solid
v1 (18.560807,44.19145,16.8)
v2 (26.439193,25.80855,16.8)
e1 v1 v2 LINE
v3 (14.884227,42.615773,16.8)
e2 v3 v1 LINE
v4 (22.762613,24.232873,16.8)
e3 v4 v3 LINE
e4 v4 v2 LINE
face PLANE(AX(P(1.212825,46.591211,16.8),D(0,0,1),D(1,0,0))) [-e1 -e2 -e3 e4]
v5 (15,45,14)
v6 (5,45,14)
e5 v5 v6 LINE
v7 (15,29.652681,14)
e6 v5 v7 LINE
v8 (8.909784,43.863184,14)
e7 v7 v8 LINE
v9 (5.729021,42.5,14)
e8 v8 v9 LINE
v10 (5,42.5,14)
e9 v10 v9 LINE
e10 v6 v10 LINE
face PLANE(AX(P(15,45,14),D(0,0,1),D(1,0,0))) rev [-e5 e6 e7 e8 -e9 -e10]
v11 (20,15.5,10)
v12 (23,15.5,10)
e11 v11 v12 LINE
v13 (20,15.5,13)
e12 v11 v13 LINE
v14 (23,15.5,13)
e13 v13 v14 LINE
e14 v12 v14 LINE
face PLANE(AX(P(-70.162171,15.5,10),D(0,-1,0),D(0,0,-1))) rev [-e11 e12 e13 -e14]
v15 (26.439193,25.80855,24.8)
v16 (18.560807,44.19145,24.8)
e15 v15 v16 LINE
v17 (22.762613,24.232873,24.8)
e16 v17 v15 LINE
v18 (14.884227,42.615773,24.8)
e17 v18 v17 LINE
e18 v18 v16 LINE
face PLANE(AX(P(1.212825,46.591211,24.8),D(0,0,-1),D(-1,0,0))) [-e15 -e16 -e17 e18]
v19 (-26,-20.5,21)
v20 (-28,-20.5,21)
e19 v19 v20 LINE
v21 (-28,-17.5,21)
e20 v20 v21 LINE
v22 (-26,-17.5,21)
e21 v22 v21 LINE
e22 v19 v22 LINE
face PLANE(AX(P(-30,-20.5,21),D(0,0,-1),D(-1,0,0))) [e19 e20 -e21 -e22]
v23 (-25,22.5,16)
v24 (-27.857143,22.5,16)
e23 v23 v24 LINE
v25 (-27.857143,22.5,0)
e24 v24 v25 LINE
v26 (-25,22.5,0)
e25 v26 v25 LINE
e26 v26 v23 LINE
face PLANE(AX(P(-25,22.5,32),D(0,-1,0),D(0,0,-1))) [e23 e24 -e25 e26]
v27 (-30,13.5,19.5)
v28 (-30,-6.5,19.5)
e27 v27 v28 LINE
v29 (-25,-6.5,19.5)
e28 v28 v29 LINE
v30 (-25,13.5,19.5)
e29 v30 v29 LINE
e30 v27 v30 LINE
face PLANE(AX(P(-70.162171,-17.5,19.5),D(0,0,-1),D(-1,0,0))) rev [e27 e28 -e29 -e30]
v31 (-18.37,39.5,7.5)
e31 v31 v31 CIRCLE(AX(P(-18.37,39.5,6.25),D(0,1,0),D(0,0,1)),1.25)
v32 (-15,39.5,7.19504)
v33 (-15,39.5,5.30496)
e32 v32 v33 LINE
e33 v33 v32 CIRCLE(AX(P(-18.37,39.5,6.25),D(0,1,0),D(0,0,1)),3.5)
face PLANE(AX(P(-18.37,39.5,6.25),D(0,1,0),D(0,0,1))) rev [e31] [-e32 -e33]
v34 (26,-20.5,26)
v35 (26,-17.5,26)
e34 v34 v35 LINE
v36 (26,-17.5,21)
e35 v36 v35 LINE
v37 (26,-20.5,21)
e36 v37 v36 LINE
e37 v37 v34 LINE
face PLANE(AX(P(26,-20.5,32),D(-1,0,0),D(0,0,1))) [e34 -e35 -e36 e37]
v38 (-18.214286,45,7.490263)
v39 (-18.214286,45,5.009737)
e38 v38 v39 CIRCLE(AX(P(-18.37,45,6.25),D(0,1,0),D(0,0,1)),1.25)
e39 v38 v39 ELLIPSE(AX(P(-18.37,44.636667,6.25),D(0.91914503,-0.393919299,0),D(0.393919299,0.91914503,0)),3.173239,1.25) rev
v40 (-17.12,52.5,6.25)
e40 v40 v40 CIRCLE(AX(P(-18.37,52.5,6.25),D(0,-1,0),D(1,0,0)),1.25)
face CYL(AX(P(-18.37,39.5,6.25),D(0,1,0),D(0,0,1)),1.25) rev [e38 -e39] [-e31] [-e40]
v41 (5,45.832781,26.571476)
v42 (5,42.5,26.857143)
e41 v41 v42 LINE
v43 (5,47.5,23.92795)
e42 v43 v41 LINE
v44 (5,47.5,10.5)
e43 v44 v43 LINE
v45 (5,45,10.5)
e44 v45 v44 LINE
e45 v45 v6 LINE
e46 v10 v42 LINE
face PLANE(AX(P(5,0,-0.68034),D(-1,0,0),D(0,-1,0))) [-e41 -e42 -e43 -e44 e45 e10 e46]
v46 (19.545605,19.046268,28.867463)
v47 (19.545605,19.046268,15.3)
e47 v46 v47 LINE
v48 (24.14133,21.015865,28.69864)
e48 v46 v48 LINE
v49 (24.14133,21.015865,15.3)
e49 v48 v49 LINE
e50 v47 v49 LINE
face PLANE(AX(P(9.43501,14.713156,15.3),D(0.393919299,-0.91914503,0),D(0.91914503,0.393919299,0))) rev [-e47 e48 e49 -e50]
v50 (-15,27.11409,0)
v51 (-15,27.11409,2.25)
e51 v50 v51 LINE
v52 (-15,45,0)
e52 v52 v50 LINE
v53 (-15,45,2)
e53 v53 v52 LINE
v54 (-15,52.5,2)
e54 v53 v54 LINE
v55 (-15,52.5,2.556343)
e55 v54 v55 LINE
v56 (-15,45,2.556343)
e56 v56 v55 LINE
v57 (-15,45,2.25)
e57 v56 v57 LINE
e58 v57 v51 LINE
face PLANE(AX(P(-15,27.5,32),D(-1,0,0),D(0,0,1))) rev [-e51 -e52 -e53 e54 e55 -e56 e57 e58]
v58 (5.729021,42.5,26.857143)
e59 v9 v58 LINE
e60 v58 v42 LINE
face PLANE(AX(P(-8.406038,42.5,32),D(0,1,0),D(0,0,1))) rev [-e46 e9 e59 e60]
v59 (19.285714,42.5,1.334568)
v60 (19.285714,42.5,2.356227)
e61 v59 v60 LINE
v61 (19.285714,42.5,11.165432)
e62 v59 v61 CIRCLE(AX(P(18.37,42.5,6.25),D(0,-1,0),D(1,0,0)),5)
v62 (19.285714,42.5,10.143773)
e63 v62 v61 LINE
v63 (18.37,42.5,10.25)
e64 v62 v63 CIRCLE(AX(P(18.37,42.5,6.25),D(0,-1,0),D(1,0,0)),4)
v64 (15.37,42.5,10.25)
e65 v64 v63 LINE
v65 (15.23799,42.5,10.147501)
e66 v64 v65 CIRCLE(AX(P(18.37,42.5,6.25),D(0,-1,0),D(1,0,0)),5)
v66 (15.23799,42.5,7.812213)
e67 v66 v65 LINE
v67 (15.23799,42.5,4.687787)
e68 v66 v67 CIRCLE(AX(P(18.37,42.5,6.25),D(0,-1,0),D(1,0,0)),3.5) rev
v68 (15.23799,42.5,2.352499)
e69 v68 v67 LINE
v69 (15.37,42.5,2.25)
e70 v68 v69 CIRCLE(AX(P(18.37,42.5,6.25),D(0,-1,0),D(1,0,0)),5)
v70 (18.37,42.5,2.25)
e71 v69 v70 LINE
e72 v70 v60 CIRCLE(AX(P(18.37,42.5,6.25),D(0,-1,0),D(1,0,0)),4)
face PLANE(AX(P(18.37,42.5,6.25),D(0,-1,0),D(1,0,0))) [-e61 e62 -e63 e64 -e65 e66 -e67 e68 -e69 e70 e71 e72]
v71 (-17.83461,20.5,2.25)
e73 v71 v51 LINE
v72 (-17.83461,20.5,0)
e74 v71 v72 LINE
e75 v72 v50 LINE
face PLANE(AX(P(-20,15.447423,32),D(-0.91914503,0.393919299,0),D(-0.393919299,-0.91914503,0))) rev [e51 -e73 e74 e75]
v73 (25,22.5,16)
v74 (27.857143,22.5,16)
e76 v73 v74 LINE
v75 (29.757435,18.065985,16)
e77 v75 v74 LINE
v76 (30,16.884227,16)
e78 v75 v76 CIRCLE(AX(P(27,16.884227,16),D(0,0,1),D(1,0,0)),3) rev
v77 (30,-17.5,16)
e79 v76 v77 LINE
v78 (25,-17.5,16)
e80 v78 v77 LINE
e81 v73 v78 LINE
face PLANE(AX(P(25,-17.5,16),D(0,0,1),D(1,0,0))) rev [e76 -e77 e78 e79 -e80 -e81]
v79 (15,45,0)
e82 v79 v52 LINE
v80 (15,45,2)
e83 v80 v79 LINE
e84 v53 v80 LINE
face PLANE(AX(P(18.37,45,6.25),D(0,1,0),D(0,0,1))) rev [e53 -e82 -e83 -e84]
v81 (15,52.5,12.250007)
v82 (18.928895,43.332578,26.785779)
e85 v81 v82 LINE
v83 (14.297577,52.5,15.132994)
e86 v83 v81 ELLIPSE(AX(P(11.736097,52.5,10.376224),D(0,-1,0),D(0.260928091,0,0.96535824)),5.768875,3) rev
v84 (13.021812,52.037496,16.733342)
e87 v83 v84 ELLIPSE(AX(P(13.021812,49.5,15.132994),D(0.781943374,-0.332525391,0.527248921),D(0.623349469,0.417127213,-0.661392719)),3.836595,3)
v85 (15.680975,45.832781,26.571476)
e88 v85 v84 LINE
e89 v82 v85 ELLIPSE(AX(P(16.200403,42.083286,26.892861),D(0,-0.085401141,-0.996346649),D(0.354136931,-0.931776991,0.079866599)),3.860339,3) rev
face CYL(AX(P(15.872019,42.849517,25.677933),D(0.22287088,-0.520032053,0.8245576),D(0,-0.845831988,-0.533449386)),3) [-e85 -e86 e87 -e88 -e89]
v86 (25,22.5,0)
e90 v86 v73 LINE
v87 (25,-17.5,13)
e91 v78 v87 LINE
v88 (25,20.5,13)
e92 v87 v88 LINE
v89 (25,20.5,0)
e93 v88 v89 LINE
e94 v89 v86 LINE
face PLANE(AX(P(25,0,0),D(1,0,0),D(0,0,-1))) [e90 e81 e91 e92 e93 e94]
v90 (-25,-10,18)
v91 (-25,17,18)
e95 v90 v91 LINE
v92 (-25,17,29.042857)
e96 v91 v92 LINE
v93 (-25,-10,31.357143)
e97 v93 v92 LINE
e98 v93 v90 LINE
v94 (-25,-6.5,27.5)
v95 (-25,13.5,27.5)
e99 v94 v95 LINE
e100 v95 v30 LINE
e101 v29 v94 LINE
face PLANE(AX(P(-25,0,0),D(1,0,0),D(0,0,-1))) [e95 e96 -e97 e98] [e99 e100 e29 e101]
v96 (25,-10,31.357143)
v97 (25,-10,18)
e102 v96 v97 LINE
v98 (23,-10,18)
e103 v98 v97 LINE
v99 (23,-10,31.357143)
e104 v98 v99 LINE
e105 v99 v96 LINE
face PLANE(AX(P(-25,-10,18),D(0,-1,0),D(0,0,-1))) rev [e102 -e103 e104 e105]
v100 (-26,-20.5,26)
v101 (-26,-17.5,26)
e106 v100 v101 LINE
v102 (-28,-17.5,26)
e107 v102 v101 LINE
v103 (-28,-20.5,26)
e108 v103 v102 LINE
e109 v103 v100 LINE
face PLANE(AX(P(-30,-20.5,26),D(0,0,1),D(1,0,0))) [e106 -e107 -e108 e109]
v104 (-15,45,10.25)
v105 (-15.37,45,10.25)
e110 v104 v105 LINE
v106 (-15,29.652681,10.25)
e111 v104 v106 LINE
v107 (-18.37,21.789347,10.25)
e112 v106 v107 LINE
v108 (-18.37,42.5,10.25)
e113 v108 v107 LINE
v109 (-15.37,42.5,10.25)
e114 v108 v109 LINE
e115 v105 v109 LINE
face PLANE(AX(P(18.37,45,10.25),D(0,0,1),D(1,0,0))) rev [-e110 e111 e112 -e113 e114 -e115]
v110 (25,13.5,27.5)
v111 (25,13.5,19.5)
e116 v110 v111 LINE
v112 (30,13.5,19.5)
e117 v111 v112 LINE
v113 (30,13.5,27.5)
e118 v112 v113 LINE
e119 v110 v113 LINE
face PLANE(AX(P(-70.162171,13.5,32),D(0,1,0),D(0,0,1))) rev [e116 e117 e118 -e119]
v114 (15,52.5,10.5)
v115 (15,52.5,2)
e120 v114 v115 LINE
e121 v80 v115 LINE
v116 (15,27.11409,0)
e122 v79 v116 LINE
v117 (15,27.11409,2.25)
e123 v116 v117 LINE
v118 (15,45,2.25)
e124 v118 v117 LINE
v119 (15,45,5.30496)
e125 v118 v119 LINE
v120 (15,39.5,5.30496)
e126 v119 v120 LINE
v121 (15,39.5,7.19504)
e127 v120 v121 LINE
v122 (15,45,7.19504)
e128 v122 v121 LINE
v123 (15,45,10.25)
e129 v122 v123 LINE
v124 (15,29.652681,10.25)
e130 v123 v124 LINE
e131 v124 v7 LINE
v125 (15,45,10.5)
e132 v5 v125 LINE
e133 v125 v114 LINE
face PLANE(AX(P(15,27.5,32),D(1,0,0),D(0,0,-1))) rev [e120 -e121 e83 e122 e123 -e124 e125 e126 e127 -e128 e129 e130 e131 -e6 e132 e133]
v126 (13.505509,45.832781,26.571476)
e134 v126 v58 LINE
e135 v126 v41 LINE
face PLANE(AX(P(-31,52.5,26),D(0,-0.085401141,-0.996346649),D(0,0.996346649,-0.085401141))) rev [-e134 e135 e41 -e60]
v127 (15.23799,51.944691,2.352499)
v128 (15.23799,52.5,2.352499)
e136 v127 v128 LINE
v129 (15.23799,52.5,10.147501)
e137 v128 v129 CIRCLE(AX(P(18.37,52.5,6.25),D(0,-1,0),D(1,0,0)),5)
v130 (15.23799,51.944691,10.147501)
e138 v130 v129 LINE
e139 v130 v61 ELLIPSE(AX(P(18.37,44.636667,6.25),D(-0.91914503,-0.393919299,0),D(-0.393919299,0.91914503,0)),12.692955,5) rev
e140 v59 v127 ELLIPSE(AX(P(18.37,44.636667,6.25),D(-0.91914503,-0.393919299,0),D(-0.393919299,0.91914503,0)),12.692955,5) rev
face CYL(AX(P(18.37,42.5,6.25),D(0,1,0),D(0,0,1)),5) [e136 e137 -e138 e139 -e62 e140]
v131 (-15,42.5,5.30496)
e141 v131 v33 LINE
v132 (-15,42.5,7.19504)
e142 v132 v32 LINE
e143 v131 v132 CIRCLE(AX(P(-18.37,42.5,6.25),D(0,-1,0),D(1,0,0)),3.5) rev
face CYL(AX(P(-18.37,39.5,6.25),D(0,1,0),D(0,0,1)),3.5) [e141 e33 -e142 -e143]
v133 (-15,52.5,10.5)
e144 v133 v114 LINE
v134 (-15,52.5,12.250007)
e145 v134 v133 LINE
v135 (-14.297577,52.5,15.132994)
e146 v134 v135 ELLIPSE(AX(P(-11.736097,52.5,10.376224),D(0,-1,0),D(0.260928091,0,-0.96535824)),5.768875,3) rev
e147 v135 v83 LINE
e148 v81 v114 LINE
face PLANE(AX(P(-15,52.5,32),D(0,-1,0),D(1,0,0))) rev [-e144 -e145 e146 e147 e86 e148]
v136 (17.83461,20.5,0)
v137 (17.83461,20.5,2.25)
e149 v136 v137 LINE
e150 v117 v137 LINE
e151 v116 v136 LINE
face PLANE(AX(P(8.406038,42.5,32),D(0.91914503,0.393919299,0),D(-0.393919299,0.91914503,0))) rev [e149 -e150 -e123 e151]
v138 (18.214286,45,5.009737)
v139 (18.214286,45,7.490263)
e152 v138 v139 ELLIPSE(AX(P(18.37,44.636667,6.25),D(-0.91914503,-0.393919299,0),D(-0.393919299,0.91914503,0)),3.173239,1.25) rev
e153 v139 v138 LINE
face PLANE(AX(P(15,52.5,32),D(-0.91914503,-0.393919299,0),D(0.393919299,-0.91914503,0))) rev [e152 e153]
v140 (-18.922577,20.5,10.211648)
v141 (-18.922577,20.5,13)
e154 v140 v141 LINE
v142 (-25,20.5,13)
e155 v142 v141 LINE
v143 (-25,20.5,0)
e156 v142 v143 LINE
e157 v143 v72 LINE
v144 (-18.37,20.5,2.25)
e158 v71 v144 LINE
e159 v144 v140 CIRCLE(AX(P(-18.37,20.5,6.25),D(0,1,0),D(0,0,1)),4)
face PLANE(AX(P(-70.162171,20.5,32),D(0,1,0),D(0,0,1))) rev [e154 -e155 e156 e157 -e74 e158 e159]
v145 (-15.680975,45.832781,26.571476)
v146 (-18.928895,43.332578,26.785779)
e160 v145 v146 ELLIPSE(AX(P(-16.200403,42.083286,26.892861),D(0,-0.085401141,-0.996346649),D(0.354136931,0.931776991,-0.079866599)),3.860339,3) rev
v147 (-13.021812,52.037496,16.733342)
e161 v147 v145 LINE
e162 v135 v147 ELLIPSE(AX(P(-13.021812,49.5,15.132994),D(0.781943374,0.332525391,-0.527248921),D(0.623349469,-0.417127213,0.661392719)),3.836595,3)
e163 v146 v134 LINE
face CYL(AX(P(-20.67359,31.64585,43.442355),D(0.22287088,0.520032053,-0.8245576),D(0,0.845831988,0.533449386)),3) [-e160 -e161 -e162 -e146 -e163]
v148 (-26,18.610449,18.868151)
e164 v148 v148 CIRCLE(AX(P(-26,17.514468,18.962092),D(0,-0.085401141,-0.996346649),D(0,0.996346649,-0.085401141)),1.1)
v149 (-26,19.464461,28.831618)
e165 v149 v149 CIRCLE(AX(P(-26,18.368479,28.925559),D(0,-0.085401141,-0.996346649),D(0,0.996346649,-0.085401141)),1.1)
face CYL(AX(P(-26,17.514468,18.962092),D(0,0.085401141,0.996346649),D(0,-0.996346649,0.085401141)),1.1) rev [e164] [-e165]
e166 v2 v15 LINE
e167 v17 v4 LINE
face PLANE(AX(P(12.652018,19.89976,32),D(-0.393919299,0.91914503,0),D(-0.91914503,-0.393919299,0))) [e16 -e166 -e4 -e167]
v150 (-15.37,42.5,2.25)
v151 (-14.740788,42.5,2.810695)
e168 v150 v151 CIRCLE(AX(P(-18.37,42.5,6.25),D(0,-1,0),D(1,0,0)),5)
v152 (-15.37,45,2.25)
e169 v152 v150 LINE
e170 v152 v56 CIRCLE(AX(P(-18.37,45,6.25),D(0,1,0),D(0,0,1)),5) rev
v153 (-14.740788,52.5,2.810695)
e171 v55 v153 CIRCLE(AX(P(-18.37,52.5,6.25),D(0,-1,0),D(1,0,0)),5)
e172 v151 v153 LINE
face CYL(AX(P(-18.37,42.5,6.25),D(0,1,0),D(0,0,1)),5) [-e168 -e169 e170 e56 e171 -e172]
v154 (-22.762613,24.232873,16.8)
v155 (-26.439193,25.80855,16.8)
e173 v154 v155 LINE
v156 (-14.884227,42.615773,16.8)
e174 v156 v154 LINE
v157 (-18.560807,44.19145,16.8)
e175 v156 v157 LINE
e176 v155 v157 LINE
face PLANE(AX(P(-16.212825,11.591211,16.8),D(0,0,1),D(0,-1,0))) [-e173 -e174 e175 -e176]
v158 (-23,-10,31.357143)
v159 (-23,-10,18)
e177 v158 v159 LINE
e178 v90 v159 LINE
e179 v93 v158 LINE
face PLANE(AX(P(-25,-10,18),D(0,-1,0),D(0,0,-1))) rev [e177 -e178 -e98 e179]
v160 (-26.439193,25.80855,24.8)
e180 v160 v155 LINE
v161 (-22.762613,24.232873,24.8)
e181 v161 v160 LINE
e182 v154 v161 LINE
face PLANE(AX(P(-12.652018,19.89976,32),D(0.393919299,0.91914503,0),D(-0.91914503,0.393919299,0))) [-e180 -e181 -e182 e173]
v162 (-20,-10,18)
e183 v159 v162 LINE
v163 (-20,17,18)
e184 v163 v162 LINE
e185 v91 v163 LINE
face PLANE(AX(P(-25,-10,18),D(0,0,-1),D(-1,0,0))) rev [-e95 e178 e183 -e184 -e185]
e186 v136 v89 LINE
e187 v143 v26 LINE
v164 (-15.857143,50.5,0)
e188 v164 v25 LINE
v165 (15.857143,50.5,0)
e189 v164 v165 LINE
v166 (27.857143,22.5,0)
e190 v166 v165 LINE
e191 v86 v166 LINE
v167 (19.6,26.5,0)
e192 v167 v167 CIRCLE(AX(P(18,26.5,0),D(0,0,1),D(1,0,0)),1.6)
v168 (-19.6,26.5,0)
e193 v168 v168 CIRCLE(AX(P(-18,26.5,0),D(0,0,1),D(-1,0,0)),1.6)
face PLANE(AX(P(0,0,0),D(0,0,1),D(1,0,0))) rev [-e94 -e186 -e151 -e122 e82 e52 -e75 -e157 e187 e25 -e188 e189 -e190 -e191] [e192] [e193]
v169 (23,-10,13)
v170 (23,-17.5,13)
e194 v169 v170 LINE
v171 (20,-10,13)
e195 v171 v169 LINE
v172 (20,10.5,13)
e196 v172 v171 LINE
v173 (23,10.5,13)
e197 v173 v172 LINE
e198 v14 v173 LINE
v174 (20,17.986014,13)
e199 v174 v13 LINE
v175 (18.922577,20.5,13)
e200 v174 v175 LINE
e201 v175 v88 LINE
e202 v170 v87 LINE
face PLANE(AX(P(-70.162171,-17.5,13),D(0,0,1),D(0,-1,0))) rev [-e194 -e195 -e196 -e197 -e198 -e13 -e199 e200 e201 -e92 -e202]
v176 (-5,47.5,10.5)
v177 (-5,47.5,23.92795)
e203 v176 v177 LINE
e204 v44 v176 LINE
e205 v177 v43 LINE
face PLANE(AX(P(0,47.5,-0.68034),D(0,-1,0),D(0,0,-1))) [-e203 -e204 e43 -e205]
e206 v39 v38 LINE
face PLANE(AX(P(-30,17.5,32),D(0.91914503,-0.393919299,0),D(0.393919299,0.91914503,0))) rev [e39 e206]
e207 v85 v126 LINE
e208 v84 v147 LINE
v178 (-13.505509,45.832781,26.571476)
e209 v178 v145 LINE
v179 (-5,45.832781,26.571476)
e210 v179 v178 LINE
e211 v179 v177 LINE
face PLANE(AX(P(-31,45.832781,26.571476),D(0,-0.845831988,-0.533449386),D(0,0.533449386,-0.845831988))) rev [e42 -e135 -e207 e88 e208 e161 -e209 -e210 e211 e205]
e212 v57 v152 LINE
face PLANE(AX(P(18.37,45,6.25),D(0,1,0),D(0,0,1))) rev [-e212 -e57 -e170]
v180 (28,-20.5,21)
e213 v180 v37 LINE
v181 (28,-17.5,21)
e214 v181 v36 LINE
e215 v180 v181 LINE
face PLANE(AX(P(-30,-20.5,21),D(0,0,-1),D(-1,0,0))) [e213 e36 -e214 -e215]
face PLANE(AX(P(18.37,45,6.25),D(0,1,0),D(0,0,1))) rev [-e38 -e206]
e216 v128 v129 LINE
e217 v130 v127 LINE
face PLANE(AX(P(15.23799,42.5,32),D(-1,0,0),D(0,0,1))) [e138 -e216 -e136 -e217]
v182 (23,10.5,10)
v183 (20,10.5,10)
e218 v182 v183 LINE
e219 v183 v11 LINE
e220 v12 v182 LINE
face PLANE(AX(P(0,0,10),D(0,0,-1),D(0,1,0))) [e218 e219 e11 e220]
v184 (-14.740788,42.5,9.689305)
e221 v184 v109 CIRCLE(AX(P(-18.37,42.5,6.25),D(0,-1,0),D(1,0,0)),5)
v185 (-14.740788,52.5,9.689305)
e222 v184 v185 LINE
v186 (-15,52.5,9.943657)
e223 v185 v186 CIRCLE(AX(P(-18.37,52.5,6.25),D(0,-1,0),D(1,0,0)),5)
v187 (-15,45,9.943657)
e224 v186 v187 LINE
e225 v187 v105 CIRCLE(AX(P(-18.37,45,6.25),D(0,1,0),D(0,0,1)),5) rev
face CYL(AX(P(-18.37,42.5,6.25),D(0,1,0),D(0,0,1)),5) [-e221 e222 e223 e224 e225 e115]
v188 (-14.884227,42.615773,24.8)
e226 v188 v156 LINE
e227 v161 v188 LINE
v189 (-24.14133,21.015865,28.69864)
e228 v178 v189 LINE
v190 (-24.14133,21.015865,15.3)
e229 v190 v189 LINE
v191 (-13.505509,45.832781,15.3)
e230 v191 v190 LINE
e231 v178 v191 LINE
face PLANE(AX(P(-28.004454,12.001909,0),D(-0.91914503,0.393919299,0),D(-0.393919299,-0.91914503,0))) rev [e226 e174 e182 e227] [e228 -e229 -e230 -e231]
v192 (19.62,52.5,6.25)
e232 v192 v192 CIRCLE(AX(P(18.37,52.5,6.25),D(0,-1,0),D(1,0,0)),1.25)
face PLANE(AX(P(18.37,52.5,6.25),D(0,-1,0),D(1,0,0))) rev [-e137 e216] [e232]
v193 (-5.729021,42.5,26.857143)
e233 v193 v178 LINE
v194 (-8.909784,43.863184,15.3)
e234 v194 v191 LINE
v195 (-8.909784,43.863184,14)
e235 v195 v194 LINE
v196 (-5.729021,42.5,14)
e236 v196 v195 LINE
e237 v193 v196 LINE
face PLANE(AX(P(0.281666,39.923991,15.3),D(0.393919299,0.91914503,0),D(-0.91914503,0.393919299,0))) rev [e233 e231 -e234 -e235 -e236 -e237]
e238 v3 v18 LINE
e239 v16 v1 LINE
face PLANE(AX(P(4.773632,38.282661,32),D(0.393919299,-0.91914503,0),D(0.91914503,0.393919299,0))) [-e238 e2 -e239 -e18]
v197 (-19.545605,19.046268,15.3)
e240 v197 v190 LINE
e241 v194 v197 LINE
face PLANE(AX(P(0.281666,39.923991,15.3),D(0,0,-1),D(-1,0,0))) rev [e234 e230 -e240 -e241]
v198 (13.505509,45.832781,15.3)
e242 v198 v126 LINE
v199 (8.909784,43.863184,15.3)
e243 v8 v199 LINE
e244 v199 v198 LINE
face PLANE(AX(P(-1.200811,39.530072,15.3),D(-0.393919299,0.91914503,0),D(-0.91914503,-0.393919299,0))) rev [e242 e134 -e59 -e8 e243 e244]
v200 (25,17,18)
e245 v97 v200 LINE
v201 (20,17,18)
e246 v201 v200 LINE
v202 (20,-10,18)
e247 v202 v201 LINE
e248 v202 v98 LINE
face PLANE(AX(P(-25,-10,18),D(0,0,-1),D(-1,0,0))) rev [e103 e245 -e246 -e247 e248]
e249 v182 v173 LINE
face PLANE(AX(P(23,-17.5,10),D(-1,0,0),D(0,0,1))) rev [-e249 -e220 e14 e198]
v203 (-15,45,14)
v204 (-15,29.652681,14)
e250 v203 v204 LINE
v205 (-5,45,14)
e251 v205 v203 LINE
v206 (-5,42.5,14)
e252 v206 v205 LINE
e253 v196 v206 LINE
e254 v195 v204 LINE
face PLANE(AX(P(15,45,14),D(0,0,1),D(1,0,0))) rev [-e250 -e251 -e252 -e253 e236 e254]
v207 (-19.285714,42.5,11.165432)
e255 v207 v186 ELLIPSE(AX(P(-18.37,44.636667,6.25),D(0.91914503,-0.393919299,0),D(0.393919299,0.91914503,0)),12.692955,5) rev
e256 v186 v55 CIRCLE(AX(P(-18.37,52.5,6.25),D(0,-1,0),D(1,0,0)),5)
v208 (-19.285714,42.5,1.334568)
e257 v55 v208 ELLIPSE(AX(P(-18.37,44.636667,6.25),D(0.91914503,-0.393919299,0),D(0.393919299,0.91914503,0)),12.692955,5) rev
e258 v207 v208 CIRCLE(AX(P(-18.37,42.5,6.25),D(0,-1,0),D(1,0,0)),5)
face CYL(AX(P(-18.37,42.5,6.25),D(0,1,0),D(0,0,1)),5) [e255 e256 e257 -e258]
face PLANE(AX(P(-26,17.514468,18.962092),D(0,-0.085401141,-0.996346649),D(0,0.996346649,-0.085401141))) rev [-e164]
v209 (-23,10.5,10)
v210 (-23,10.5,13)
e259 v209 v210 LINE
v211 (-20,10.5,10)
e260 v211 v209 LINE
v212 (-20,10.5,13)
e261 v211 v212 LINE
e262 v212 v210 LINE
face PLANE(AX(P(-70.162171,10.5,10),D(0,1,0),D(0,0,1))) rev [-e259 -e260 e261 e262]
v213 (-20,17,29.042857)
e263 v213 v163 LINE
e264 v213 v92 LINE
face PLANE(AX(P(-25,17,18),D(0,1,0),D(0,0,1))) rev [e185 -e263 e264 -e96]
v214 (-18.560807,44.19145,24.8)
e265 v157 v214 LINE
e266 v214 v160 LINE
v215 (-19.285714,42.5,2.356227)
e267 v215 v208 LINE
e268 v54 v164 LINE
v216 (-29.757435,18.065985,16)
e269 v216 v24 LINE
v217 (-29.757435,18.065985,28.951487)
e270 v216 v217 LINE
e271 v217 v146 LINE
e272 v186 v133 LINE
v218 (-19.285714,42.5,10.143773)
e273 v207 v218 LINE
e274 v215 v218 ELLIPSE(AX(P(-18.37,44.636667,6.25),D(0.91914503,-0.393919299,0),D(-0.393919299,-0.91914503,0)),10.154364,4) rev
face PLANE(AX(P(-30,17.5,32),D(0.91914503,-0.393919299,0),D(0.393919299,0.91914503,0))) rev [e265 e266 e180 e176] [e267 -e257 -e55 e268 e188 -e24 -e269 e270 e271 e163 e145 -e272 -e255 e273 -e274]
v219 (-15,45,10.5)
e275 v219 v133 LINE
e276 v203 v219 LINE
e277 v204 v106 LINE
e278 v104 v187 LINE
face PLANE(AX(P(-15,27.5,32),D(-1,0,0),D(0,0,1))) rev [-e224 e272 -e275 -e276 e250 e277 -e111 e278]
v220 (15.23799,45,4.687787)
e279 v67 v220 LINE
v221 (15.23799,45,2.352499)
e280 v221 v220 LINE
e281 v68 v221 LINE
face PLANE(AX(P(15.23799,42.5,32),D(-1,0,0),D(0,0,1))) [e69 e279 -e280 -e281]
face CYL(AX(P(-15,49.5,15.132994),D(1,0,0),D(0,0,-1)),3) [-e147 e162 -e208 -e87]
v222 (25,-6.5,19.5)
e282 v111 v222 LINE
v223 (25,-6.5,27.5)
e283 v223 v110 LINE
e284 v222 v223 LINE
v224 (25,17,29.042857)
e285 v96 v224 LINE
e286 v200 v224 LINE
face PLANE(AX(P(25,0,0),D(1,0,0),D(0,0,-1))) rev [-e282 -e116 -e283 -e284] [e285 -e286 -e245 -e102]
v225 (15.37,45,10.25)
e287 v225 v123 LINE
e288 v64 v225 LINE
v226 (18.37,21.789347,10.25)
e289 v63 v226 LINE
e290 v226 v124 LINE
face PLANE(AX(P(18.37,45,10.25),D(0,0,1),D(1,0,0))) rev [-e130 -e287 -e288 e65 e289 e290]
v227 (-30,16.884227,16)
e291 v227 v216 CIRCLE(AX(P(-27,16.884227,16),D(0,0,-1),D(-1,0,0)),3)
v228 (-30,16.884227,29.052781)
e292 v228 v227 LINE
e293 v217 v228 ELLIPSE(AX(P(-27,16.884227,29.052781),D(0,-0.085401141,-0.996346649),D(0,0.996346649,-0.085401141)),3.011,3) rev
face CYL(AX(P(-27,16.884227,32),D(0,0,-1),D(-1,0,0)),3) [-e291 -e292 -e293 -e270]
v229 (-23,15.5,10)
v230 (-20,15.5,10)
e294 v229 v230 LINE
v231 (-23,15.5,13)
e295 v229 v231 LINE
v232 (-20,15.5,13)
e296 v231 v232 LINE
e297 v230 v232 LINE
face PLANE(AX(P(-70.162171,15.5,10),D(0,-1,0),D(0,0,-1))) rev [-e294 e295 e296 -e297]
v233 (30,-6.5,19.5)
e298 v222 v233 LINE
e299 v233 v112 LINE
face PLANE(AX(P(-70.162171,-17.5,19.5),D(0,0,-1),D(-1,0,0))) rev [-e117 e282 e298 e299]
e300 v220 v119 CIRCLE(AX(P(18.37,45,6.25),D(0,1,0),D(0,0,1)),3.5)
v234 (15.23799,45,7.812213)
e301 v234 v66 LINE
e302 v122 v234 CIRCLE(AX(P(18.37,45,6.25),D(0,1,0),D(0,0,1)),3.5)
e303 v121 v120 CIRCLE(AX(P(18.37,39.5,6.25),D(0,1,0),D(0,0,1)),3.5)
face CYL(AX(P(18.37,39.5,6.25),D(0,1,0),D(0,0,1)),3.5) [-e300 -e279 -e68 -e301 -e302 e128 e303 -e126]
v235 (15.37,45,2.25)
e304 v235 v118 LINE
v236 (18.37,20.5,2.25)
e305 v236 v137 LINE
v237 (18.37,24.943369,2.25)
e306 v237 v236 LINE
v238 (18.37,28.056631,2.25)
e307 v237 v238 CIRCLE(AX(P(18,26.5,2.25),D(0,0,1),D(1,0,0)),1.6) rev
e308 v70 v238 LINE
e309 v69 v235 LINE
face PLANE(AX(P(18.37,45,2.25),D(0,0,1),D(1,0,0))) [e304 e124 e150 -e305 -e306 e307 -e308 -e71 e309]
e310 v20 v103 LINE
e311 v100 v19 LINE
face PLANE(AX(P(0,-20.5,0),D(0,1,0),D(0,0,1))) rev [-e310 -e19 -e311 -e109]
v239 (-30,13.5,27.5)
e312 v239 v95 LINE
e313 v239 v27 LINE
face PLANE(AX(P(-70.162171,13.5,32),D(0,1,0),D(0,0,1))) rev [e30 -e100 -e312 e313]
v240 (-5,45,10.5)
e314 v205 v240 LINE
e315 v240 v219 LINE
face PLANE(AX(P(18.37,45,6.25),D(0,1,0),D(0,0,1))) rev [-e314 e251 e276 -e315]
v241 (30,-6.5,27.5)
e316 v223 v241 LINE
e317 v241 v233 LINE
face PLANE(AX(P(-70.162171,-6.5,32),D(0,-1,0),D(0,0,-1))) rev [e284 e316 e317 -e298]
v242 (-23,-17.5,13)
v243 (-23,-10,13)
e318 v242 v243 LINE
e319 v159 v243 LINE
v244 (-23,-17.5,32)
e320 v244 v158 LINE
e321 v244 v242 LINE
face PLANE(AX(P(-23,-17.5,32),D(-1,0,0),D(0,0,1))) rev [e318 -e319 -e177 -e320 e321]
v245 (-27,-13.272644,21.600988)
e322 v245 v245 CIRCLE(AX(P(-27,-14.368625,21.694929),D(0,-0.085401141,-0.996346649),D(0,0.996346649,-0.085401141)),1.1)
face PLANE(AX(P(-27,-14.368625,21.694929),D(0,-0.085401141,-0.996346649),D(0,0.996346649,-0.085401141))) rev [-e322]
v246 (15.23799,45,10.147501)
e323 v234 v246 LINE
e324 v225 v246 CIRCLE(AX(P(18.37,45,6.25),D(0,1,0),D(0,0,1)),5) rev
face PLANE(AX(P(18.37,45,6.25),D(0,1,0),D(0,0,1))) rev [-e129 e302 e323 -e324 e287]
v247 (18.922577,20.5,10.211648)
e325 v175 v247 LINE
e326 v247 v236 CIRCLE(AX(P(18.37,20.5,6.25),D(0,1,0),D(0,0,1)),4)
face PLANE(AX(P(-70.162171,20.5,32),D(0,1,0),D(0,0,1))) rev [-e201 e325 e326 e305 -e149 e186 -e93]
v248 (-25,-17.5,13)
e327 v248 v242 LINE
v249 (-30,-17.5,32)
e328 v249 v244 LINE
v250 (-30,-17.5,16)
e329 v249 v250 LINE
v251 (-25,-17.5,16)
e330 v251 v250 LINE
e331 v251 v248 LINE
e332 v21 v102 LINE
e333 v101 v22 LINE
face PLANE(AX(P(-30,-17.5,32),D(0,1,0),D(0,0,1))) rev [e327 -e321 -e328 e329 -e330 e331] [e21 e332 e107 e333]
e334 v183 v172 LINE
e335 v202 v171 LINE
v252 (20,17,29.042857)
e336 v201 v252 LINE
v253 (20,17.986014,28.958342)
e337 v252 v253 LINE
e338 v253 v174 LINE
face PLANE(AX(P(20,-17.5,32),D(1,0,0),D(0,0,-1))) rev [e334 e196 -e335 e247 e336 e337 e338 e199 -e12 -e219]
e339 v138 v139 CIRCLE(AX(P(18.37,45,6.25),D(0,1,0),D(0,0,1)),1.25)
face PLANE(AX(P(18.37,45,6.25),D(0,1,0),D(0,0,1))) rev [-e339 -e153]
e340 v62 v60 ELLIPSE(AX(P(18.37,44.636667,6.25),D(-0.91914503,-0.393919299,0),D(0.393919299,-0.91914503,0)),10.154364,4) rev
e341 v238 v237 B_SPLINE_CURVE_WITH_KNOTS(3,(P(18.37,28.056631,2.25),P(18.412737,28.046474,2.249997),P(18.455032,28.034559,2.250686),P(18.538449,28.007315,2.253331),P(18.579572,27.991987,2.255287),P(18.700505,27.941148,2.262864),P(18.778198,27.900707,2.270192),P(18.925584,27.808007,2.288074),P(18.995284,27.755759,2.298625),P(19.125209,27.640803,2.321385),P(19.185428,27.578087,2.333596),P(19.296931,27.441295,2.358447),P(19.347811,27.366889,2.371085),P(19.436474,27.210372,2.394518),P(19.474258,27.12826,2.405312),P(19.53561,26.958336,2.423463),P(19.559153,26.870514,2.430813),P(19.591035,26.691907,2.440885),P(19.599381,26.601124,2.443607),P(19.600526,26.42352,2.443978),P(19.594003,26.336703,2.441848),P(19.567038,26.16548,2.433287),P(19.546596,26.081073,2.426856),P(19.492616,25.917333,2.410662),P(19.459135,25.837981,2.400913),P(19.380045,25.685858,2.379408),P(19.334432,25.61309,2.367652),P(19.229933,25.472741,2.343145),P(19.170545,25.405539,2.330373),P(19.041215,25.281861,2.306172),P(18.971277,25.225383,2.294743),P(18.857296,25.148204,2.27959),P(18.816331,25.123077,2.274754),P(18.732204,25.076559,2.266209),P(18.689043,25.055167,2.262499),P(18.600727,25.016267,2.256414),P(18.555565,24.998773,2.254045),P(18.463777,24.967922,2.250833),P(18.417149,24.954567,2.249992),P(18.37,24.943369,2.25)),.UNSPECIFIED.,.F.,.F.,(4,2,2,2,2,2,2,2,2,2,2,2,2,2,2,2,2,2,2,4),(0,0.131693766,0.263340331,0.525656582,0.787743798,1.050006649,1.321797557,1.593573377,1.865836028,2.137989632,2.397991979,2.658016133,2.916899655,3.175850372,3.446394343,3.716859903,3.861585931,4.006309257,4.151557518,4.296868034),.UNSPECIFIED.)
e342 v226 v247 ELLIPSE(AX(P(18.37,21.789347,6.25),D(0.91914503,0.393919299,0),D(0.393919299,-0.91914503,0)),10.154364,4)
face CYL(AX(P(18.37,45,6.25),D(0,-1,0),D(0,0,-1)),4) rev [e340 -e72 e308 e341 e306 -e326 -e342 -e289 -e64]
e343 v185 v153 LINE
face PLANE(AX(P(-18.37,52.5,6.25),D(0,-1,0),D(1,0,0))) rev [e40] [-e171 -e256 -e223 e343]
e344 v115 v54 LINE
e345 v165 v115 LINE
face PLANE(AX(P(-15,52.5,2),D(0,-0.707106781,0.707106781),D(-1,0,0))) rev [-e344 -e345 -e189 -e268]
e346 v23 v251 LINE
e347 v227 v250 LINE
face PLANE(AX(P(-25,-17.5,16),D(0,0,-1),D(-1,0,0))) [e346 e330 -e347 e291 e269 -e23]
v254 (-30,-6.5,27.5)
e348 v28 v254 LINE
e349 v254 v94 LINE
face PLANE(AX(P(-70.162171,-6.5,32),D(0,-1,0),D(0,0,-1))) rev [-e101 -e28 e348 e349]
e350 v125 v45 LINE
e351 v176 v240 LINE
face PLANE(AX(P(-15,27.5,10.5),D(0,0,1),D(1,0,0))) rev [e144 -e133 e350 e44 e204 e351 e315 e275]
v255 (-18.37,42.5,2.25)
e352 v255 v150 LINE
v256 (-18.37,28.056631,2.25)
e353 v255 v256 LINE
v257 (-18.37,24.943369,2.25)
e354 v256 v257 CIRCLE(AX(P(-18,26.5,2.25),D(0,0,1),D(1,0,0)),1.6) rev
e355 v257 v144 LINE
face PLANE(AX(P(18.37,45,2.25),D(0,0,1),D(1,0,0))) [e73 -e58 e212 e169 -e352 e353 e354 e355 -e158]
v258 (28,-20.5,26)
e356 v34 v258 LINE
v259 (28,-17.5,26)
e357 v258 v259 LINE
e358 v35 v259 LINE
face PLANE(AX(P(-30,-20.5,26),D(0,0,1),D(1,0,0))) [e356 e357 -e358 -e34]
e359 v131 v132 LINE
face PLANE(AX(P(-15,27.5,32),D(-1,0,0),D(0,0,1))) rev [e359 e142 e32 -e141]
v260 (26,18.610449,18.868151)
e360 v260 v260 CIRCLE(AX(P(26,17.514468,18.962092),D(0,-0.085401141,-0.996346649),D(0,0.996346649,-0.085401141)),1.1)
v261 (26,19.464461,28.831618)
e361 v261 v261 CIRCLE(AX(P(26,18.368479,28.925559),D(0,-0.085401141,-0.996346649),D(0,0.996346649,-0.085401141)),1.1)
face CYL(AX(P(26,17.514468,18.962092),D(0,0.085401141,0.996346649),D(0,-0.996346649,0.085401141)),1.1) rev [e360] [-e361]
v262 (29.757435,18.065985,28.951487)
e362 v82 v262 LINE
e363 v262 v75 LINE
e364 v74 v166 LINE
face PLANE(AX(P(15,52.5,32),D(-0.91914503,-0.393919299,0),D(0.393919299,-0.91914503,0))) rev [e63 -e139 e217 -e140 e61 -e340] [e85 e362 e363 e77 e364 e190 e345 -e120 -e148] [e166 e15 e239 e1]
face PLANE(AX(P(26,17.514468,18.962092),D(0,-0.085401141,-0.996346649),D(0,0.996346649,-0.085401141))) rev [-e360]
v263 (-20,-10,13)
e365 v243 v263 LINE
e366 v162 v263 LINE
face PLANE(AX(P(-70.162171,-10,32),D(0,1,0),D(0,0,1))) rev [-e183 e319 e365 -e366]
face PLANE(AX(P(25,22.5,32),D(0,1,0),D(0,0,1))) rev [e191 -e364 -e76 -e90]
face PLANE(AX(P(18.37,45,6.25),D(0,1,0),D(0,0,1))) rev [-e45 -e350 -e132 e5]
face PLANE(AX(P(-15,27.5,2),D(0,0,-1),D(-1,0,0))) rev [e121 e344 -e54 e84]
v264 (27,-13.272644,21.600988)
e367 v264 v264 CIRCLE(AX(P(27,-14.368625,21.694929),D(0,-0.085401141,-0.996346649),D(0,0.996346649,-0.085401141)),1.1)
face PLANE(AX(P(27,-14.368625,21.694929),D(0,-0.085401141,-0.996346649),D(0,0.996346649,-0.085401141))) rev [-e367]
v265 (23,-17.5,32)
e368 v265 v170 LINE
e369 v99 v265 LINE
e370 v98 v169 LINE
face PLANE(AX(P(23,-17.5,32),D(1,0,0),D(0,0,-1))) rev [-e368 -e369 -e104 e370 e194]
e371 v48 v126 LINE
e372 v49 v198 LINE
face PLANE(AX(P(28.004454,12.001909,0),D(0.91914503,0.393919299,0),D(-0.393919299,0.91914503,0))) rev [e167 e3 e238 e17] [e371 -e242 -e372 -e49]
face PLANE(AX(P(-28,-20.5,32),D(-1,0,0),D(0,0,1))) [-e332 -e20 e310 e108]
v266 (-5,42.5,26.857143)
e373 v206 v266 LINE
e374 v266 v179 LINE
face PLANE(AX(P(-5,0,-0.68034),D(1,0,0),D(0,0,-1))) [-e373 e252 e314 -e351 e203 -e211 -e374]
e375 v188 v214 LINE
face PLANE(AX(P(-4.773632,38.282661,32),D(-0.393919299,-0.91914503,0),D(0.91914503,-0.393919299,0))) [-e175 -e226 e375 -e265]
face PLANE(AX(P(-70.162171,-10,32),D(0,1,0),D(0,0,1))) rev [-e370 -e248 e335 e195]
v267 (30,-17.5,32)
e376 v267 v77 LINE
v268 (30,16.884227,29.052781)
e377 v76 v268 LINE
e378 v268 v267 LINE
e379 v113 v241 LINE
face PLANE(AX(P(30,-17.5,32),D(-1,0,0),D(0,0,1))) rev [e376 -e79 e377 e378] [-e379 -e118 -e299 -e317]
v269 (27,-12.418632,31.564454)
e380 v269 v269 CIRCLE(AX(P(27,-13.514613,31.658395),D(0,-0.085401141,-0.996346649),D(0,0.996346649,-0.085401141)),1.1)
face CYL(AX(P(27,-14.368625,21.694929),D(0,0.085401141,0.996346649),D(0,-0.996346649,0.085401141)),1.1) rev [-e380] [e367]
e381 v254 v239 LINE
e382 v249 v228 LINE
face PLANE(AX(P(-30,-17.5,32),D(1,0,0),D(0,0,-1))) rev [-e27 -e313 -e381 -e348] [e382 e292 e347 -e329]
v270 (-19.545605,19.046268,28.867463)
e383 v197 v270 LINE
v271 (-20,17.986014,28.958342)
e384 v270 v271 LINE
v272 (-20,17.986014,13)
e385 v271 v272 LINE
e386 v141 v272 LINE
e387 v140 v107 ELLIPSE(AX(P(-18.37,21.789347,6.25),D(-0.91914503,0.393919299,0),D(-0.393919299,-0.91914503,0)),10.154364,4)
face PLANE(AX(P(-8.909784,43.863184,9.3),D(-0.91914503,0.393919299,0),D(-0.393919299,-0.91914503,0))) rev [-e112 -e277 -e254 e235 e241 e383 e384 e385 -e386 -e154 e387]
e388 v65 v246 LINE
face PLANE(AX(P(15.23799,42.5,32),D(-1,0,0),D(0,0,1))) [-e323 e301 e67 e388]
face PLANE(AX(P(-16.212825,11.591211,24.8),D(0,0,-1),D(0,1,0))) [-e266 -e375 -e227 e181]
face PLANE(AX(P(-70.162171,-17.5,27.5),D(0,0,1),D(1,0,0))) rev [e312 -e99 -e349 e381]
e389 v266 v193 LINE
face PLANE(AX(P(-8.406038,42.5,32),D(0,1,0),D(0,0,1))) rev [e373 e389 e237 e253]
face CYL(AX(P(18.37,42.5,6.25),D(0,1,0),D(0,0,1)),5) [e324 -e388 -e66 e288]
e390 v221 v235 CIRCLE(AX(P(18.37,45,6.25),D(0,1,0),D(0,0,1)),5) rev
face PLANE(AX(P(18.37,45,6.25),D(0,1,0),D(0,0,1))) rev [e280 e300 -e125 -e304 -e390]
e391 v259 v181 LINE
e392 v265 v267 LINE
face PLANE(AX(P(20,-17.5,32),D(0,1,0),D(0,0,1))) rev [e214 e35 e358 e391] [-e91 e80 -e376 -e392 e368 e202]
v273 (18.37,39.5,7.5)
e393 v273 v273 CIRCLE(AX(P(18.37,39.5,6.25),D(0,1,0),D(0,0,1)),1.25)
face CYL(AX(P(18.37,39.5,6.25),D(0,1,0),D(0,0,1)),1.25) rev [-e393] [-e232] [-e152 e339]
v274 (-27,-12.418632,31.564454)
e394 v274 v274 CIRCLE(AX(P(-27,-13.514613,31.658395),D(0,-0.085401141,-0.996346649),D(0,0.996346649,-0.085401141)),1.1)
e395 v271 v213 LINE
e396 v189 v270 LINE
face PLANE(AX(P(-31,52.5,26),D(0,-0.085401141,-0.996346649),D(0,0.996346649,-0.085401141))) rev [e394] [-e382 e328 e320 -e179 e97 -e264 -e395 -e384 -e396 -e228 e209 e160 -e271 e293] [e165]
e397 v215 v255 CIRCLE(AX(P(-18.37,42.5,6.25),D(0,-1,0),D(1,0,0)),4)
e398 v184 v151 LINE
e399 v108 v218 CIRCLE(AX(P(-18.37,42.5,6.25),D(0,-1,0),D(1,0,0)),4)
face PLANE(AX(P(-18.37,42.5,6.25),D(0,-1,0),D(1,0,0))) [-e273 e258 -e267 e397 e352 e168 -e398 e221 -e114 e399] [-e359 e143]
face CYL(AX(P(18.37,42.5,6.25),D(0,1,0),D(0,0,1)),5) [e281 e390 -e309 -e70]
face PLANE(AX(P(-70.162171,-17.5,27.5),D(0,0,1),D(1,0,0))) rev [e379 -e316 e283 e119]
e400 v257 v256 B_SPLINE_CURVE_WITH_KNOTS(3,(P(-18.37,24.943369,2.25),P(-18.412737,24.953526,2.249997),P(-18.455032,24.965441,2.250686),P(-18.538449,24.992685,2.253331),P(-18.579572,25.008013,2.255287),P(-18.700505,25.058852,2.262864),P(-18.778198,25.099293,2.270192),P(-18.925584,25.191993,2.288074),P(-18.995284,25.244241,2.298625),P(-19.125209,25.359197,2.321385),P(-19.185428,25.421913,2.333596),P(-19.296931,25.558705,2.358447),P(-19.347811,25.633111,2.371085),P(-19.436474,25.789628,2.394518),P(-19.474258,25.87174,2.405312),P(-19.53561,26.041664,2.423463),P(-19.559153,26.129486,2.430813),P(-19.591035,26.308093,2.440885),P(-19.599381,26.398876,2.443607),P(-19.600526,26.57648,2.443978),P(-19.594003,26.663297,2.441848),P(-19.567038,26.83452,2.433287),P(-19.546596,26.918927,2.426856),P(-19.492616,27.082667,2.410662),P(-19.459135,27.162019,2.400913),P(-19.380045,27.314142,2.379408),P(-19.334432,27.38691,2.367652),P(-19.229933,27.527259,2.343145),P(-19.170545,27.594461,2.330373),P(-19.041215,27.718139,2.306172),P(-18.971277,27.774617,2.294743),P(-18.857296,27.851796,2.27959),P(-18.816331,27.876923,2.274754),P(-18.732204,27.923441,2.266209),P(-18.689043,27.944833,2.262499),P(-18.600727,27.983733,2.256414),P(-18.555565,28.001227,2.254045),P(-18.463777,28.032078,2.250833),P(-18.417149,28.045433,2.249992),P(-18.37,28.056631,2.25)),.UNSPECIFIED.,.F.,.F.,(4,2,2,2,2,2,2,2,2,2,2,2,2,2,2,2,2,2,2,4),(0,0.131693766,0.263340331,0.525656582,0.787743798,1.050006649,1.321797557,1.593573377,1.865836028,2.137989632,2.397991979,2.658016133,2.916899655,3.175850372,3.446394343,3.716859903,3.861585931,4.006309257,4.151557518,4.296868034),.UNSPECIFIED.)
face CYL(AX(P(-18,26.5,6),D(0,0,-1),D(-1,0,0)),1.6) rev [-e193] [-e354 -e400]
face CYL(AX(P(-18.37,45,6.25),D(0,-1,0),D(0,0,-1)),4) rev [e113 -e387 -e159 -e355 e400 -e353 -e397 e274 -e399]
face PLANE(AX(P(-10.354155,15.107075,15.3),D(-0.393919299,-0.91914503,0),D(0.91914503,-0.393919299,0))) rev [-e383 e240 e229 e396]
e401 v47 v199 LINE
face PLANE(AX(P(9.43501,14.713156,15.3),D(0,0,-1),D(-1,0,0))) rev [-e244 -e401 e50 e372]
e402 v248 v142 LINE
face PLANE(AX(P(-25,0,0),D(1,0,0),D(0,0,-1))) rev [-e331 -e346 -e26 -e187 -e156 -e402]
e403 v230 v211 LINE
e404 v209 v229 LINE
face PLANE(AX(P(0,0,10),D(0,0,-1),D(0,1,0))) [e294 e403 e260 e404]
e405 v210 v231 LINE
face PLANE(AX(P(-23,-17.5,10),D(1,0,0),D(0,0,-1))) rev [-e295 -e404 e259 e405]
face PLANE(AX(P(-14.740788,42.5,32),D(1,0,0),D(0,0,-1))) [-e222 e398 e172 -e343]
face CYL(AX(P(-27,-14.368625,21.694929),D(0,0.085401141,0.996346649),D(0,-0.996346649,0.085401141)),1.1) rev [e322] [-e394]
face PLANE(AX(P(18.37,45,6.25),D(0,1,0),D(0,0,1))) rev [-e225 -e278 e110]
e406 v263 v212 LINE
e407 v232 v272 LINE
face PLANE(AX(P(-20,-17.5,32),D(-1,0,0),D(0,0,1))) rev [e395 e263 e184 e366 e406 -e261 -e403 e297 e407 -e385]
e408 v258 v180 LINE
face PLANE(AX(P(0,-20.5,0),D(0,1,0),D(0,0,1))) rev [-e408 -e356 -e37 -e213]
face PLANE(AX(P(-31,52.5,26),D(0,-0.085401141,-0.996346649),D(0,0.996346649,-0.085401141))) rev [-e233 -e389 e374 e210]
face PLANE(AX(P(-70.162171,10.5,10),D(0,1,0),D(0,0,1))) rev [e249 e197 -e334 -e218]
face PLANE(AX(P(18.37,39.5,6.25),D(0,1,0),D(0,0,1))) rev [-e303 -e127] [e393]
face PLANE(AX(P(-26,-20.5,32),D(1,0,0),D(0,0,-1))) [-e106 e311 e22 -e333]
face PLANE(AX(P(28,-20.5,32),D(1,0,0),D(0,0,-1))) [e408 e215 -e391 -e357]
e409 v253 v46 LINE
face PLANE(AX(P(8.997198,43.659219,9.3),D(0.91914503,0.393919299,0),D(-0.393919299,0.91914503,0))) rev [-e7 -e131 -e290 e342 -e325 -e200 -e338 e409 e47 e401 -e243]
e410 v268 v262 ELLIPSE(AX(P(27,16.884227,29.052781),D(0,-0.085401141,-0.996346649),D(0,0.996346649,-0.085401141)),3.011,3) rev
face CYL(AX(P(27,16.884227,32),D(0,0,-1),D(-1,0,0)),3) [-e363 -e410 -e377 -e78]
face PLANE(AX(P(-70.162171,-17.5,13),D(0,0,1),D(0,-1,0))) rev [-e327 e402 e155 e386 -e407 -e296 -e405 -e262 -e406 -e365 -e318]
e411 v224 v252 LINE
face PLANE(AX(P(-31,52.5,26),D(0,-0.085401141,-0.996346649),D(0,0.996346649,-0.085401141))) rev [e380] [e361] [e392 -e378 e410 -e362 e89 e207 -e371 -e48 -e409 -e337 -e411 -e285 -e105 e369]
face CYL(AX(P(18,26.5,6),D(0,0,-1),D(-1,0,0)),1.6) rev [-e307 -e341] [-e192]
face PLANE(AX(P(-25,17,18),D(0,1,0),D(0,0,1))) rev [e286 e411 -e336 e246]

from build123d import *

# Parameters (mm, degrees)
BOSS_EXTRUDE1_DEPTH = 32
CUT_EXTRUDE1_START  = 52.5
SKETCH2_W           = 30
SKETCH2_H           = 8.5
CUT_EXTRUDE1_DEPTH  = 25
CUT_EXTRUDE3_START  = 20
SKETCH3_W           = 30
SKETCH3_H           = 14
CUT_EXTRUDE3_DEPTH  = 25
CUT_EXTRUDE4_START  = 32
SKETCH4_W           = 10
SKETCH4_H           = 5
CUT_EXTRUDE4_DEPTH  = 21.5
CUT_EXTRUDE5_START  = 30
SKETCH5_W           = 8
SKETCH5_H           = 20
SKETCH5_W_2         = 13
SKETCH5_H_2         = 38
CUT_EXTRUDE5_DEPTH  = 60
SKETCH6_W           = 14
SKETCH6_H           = 27
CUT_EXTRUDE6_DEPTH  = 25
CUT_EXTRUDE7_START  = -30
SKETCH7_W           = 16
SKETCH7_H           = 40
CUT_EXTRUDE7_DEPTH  = 5
CUT_EXTRUDE8_START  = 30
SKETCH7_2_W         = 16
SKETCH7_2_H         = 40
CUT_EXTRUDE8_DEPTH  = 5
CUT_EXTRUDE9_START  = -10
SKETCH8_W           = 8
SKETCH8_H           = 20
CUT_EXTRUDE9_DEPTH  = 15
CUT_EXTRUDE10_START = -10
SKETCH9_W           = 8
SKETCH9_H           = 20
CUT_EXTRUDE10_DEPTH = 15
CUT_EXTRUDE11_START = -14
SKETCH11_W          = 16.7
SKETCH11_H          = 27
CUT_EXTRUDE11_DEPTH = 15
CUT_EXTRUDE12_START = -14
SKETCH12_W          = 16.7
SKETCH12_H          = 27
CUT_EXTRUDE12_DEPTH = 16
CUT_EXTRUDE13_DEPTH = 31
CUT_EXTRUDE14_DEPTH = 31
BOSS_EXTRUDE2_START = 45
SKETCH16_R          = 3.5
SKETCH16_R_2        = 1.25
BOSS_EXTRUDE2_DEPTH = 5.5
CUT_EXTRUDE15_START = -10
SKETCH17_R          = 1.1
CUT_EXTRUDE15_DEPTH = 10
FILLET3_R           = 3
CHAMFER1_SIZE       = 2
SKETCH18_R          = 1.6
CUT_EXTRUDE16_DEPTH = 6
CUT_EXTRUDE17_START = 13
SKETCH19_W          = 3
SKETCH19_H          = 7.5
CUT_EXTRUDE17_DEPTH = 19
BOSS_EXTRUDE4_START = -17.5
SKETCH21_W          = 2
SKETCH21_H          = 5
BOSS_EXTRUDE4_DEPTH = 3
BOSS_EXTRUDE5_START = 13
SKETCH22_W          = 3
SKETCH22_H          = 5
BOSS_EXTRUDE5_DEPTH = 3
CUT_EXTRUDE18_START = 15.3
CUT_EXTRUDE18_DEPTH = 6
CUT_EXTRUDE20_DEPTH = 42
CUT_EXTRUDE21_START = 49.5
CUT_EXTRUDE21_DEPTH = 10
BOSS_EXTRUDE6_START = 52.5
SKETCH26_R          = 1.25
BOSS_EXTRUDE6_DEPTH = 10


with BuildPart() as part:
    # Sketch1 → Boss-Extrude1 (new body)
    with BuildSketch(Plane.XY):
        Polygon((-30, 17.5), (-15, 52.5), (15, 52.5), (30, 17.5), (30, -17.5), (20, -17.5), (20, 15.44742298), (8.40603842, 42.5), (-8.40603842, 42.5), (-20, 15.44742298), (-20, -17.5), (-30, -17.5), align=None)
    extrude(amount=BOSS_EXTRUDE1_DEPTH)

    # Sketch2 → Cut-Extrude1 (cut)
    with BuildSketch(Plane(origin=(0, 0, 0), x_dir=(1, 0, 0), z_dir=(0, 1, 0)).offset(CUT_EXTRUDE1_START)):
        with Locations((0, -6.25)):
            Rectangle(SKETCH2_W, SKETCH2_H)
    extrude(amount=-CUT_EXTRUDE1_DEPTH, mode=Mode.SUBTRACT)

    # Sketch3 → Cut-Extrude3 (cut)
    with BuildSketch(Plane(origin=(0, 0, 0), x_dir=(1, 0, 0), z_dir=(0, 1, 0)).offset(CUT_EXTRUDE3_START)):
        with Locations((0, -7)):
            Rectangle(SKETCH3_W, SKETCH3_H)
        with BuildLine():
            Line((18.37, -10.25), (-18.37, -10.25))
            ThreePointArc((-18.37, -10.25), (-22.37, -6.25), (-18.37, -2.25))
            Line((-18.37, -2.25), (18.37, -2.25))
            ThreePointArc((18.37, -2.25), (22.37, -6.25), (18.37, -10.25))
        make_face()
    extrude(amount=CUT_EXTRUDE3_DEPTH, mode=Mode.SUBTRACT)

    # Sketch4 → Cut-Extrude4 (cut)
    with BuildSketch(Plane.XY.offset(CUT_EXTRUDE4_START)):
        with Locations((0, 45)):
            Rectangle(SKETCH4_W, SKETCH4_H)
    extrude(amount=-CUT_EXTRUDE4_DEPTH, mode=Mode.SUBTRACT)

    # Sketch5 → Cut-Extrude5 (cut)
    with BuildSketch(Plane(origin=(0, 0, 0), x_dir=(0, 0, -1), z_dir=(1, 0, 0)).offset(CUT_EXTRUDE5_START)):
        with Locations((-23.5, 3.5)):
            Rectangle(SKETCH5_W, SKETCH5_H)
        with Locations((-6.5, 1.5)):
            Rectangle(SKETCH5_W_2, SKETCH5_H_2)
    extrude(amount=-CUT_EXTRUDE5_DEPTH, mode=Mode.SUBTRACT)

    # Sketch6 → Cut-Extrude6 (cut, symmetric)
    with BuildSketch(Plane(origin=(0, 0, 0), x_dir=(0, 0, -1), z_dir=(1, 0, 0))):
        with Locations((-25, 3.5)):
            Rectangle(SKETCH6_W, SKETCH6_H)
    extrude(amount=CUT_EXTRUDE6_DEPTH, both=True, mode=Mode.SUBTRACT)

    # Sketch7 → Cut-Extrude7 (cut)
    with BuildSketch(Plane(origin=(0, 0, 0), x_dir=(0, 0, -1), z_dir=(1, 0, 0)).offset(CUT_EXTRUDE7_START)):
        with Locations((-8, 2.5)):
            Rectangle(SKETCH7_W, SKETCH7_H)
    extrude(amount=CUT_EXTRUDE7_DEPTH, mode=Mode.SUBTRACT)

    # Sketch7<2> → Cut-Extrude8 (cut)
    with BuildSketch(Plane(origin=(0, 0, 0), x_dir=(0, 0, -1), z_dir=(1, 0, 0)).offset(CUT_EXTRUDE8_START)):
        with Locations((-8, 2.5)):
            Rectangle(SKETCH7_2_W, SKETCH7_2_H)
    extrude(amount=-CUT_EXTRUDE8_DEPTH, mode=Mode.SUBTRACT)

    # Sketch8 → Cut-Extrude9 (cut)
    with BuildSketch(Plane(origin=(-40.872484783, 17.516779193, 0), x_dir=(0, 0, 1), z_dir=(-0.9191450300180579, 0.3939192985791677, 0)).offset(CUT_EXTRUDE9_START)):
        with Locations((20.8, 23.306891833)):
            Rectangle(SKETCH8_W, SKETCH8_H)
    extrude(amount=-CUT_EXTRUDE9_DEPTH, mode=Mode.SUBTRACT)

    # Sketch9 → Cut-Extrude10 (cut)
    with BuildSketch(Plane(origin=(40.872484783, 17.516779193, 0), x_dir=(0, 0, -1), z_dir=(0.9191450300180579, 0.3939192985791677, 0)).offset(CUT_EXTRUDE10_START)):
        with Locations((-20.8, 23.306891833)):
            Rectangle(SKETCH9_W, SKETCH9_H)
    extrude(amount=-CUT_EXTRUDE10_DEPTH, mode=Mode.SUBTRACT)

    # Sketch11 → Cut-Extrude11 (cut)
    with BuildSketch(Plane(origin=(-40.872484783, 17.516779193, 0), x_dir=(0, 0, 1), z_dir=(-0.9191450300180579, 0.3939192985791677, 0)).offset(CUT_EXTRUDE11_START)):
        with Locations((23.65, 23.306891833)):
            Rectangle(SKETCH11_W, SKETCH11_H)
    extrude(amount=-CUT_EXTRUDE11_DEPTH, mode=Mode.SUBTRACT)

    # Sketch12 → Cut-Extrude12 (cut)
    with BuildSketch(Plane(origin=(40.872484783, 17.516779193, 0), x_dir=(0, 0, -1), z_dir=(0.9191450300180579, 0.3939192985791677, 0)).offset(CUT_EXTRUDE12_START)):
        with Locations((-23.65, 23.306891833)):
            Rectangle(SKETCH12_W, SKETCH12_H)
    extrude(amount=-CUT_EXTRUDE12_DEPTH, mode=Mode.SUBTRACT)

    # Sketch13 → Cut-Extrude13 (cut, symmetric)
    with BuildSketch(Plane(origin=(0, 0, 0), x_dir=(0, 0, -1), z_dir=(1, 0, 0))):
        Polygon((-32, 52.5), (-26, 52.5), (-32, -17.5), align=None)
    extrude(amount=CUT_EXTRUDE13_DEPTH, both=True, mode=Mode.SUBTRACT)

    # Sketch14 → Cut-Extrude14 (cut, symmetric)
    with BuildSketch(Plane(origin=(0, 0, 0), x_dir=(0, 0, -1), z_dir=(1, 0, 0))):
        Polygon((-16, 52.5), (-26, 52.5), (-26.571475939, 45.832780711), align=None)
    extrude(amount=CUT_EXTRUDE14_DEPTH, both=True, mode=Mode.SUBTRACT)

    # Sketch16 → Boss-Extrude2 (add)
    # profile 1 of 2: a face of its own
    with BuildSketch(Plane(origin=(0, 0, 0), x_dir=(1, 0, 0), z_dir=(0, 1, 0)).offset(BOSS_EXTRUDE2_START)):
        with Locations(Location((18.37, -6.25, 0), (0, 0, 270))):
            Circle(SKETCH16_R)
        with Locations(Location((18.37, -6.25, 0), (0, 0, 270))):
            Circle(SKETCH16_R_2, mode=Mode.SUBTRACT)
    # profile 2 of 2: a face of its own
    with BuildSketch(Plane(origin=(0, 0, 0), x_dir=(1, 0, 0), z_dir=(0, 1, 0)).offset(BOSS_EXTRUDE2_START)):
        with Locations(Location((-18.37, -6.25, 0), (0, 0, 270))):
            Circle(SKETCH16_R)
        with Locations(Location((-18.37, -6.25, 0), (0, 0, 270))):
            Circle(SKETCH16_R_2, mode=Mode.SUBTRACT)
    extrude(amount=-BOSS_EXTRUDE2_DEPTH)

    # Sketch17 → Cut-Extrude15 (cut)
    with BuildSketch(Plane(origin=(0, 3.449230214, 40.241019165), x_dir=(1, 0, 0), z_dir=(0, 0.08540114134643577, 0.9963466490417511)).offset(CUT_EXTRUDE15_START)):
        with Locations(Location((-27, -16.168902881, 0), (0, 0, 90))):
            Circle(SKETCH17_R)
        with Locations(Location((-26, 15.831097119, 0), (0, 0, 90))):
            Circle(SKETCH17_R)
        with Locations(Location((27, -16.168902881, 0), (0, 0, 90))):
            Circle(SKETCH17_R)
        with Locations(Location((26, 15.831097119, 0), (0, 0, 90))):
            Circle(SKETCH17_R)
    extrude(amount=-CUT_EXTRUDE15_DEPTH, mode=Mode.SUBTRACT)

    # Fillet3
    fillet3_edges = [part.edges().sort_by_distance(p)[0] for p in [
        (30, 17.5, 22.5),
        (-30, 17.5, 22.5),
        (0, 52.5, 16),
        (16.428689848, 49.166390355, 21.28573797),
        (-16.428689848, 49.166390355, 21.28573797),
    ]]
    fillet(fillet3_edges, radius=FILLET3_R)

    # Chamfer1
    chamfer1_edges = [part.edges().sort_by_distance(p)[0] for p in [
        (0, 52.5, 0),
    ]]
    chamfer(chamfer1_edges, length=CHAMFER1_SIZE - 0.0001)  # a hair under: the kernel refuses the full size

    # Sketch18 → Cut-Extrude16 (cut)
    with BuildSketch(Plane.XY):
        with Locations(Location((18, 26.5, 0), (0, 0, 283.370675639))):
            Circle(SKETCH18_R)
        with Locations(Location((-18, 26.5, 0), (0, 0, 180))):
            Circle(SKETCH18_R)
    extrude(amount=CUT_EXTRUDE16_DEPTH, mode=Mode.SUBTRACT)

    # Sketch19 → Cut-Extrude17 (cut)
    with BuildSketch(Plane.XY.offset(CUT_EXTRUDE17_START)):
        with Locations((-21.5, -13.75)):
            Rectangle(SKETCH19_W, SKETCH19_H)
        with Locations((21.5, -13.75)):
            Rectangle(SKETCH19_W, SKETCH19_H)
    extrude(amount=CUT_EXTRUDE17_DEPTH, mode=Mode.SUBTRACT)

    # Sketch21 → Boss-Extrude4 (add)
    with BuildSketch(Plane(origin=(0, 0, 0), x_dir=(1, 0, 0), z_dir=(0, 1, 0)).offset(BOSS_EXTRUDE4_START)):
        with Locations((-27, -23.5)):
            Rectangle(SKETCH21_W, SKETCH21_H)
        with Locations((27, -23.5)):
            Rectangle(SKETCH21_W, SKETCH21_H)
    extrude(amount=-BOSS_EXTRUDE4_DEPTH)

    # Sketch22 → Boss-Extrude5 (add)
    with BuildSketch(Plane.XY.offset(BOSS_EXTRUDE5_START)):
        with Locations((-21.5, 13)):
            Rectangle(SKETCH22_W, SKETCH22_H)
        with Locations((21.5, 13)):
            Rectangle(SKETCH22_W, SKETCH22_H)
    extrude(amount=-BOSS_EXTRUDE5_DEPTH)

    # Sketch23 → Cut-Extrude18 (cut)
    with BuildSketch(Plane.XY.offset(CUT_EXTRUDE18_START)):
        Polygon((-16.063333209, 17.5538661), (-19.545605261, 19.046268408), (-8.909784199, 43.863184218), (-5.427512148, 42.37078191), align=None)
        Polygon((16.063333209, 17.5538661), (19.545605261, 19.046268408), (8.909784199, 43.863184218), (5.427512148, 42.37078191), align=None)
    extrude(amount=-CUT_EXTRUDE18_DEPTH, mode=Mode.SUBTRACT)

    # Sketch24 → Cut-Extrude20 (cut)
    with BuildSketch(Plane.XY):
        Polygon((-20, 15.44742298), (-20, 17.986014016), (-19.076948331, 20.139801243), (-18.160478874, 19.739638942), align=None)
        Polygon((20, 15.44742298), (18.160478874, 19.739638942), (19.076948331, 20.139801243), (20, 17.986014016), align=None)
    extrude(amount=CUT_EXTRUDE20_DEPTH, mode=Mode.SUBTRACT)

    # Sketch25 → Cut-Extrude21 (cut)
    with BuildSketch(Plane(origin=(0, 0, 0), x_dir=(1, 0, 0), z_dir=(0, 1, 0)).offset(CUT_EXTRUDE21_START)):
        with BuildLine():
            Line((-15, -7.195039682), (-15, -5.304960318))
            ThreePointArc((-15, -5.304960318), (-14.87, -6.25), (-15, -7.195039682))
        make_face()
        with BuildLine():
            Line((15, -7.195039682), (15, -5.304960318))
            ThreePointArc((15, -5.304960318), (14.87, -6.25), (15, -7.195039682))
        make_face()
    extrude(amount=-CUT_EXTRUDE21_DEPTH, mode=Mode.SUBTRACT)

    # Sketch26 → Boss-Extrude6 (add)
    # profile 1 of 2: a face of its own
    with BuildSketch(Plane(origin=(0, 0, 0), x_dir=(1, 0, 0), z_dir=(0, 1, 0)).offset(BOSS_EXTRUDE6_START)):
        with BuildLine():
            Line((-14.74078782, -9.68930501), (-14.74078782, -2.81069499))
            ThreePointArc((-14.74078782, -2.81069499), (-23.37, -6.25), (-14.74078782, -9.68930501))
        make_face()
        with Locations(Location((-18.37, -6.25, 0), (0, 0, 270))):
            Circle(SKETCH26_R, mode=Mode.SUBTRACT)
    # profile 2 of 2: a face of its own
    with BuildSketch(Plane(origin=(0, 0, 0), x_dir=(1, 0, 0), z_dir=(0, 1, 0)).offset(BOSS_EXTRUDE6_START)):
        with BuildLine():
            Line((15.237989525, -10.147500531), (15.237989525, -2.352499469))
            ThreePointArc((15.237989525, -2.352499469), (23.37, -6.25), (15.237989525, -10.147500531))
        make_face()
        with Locations(Location((18.37, -6.25, 0), (0, 0, 270))):
            Circle(SKETCH26_R, mode=Mode.SUBTRACT)
    extrude(amount=-BOSS_EXTRUDE6_DEPTH)


solid = part.part
